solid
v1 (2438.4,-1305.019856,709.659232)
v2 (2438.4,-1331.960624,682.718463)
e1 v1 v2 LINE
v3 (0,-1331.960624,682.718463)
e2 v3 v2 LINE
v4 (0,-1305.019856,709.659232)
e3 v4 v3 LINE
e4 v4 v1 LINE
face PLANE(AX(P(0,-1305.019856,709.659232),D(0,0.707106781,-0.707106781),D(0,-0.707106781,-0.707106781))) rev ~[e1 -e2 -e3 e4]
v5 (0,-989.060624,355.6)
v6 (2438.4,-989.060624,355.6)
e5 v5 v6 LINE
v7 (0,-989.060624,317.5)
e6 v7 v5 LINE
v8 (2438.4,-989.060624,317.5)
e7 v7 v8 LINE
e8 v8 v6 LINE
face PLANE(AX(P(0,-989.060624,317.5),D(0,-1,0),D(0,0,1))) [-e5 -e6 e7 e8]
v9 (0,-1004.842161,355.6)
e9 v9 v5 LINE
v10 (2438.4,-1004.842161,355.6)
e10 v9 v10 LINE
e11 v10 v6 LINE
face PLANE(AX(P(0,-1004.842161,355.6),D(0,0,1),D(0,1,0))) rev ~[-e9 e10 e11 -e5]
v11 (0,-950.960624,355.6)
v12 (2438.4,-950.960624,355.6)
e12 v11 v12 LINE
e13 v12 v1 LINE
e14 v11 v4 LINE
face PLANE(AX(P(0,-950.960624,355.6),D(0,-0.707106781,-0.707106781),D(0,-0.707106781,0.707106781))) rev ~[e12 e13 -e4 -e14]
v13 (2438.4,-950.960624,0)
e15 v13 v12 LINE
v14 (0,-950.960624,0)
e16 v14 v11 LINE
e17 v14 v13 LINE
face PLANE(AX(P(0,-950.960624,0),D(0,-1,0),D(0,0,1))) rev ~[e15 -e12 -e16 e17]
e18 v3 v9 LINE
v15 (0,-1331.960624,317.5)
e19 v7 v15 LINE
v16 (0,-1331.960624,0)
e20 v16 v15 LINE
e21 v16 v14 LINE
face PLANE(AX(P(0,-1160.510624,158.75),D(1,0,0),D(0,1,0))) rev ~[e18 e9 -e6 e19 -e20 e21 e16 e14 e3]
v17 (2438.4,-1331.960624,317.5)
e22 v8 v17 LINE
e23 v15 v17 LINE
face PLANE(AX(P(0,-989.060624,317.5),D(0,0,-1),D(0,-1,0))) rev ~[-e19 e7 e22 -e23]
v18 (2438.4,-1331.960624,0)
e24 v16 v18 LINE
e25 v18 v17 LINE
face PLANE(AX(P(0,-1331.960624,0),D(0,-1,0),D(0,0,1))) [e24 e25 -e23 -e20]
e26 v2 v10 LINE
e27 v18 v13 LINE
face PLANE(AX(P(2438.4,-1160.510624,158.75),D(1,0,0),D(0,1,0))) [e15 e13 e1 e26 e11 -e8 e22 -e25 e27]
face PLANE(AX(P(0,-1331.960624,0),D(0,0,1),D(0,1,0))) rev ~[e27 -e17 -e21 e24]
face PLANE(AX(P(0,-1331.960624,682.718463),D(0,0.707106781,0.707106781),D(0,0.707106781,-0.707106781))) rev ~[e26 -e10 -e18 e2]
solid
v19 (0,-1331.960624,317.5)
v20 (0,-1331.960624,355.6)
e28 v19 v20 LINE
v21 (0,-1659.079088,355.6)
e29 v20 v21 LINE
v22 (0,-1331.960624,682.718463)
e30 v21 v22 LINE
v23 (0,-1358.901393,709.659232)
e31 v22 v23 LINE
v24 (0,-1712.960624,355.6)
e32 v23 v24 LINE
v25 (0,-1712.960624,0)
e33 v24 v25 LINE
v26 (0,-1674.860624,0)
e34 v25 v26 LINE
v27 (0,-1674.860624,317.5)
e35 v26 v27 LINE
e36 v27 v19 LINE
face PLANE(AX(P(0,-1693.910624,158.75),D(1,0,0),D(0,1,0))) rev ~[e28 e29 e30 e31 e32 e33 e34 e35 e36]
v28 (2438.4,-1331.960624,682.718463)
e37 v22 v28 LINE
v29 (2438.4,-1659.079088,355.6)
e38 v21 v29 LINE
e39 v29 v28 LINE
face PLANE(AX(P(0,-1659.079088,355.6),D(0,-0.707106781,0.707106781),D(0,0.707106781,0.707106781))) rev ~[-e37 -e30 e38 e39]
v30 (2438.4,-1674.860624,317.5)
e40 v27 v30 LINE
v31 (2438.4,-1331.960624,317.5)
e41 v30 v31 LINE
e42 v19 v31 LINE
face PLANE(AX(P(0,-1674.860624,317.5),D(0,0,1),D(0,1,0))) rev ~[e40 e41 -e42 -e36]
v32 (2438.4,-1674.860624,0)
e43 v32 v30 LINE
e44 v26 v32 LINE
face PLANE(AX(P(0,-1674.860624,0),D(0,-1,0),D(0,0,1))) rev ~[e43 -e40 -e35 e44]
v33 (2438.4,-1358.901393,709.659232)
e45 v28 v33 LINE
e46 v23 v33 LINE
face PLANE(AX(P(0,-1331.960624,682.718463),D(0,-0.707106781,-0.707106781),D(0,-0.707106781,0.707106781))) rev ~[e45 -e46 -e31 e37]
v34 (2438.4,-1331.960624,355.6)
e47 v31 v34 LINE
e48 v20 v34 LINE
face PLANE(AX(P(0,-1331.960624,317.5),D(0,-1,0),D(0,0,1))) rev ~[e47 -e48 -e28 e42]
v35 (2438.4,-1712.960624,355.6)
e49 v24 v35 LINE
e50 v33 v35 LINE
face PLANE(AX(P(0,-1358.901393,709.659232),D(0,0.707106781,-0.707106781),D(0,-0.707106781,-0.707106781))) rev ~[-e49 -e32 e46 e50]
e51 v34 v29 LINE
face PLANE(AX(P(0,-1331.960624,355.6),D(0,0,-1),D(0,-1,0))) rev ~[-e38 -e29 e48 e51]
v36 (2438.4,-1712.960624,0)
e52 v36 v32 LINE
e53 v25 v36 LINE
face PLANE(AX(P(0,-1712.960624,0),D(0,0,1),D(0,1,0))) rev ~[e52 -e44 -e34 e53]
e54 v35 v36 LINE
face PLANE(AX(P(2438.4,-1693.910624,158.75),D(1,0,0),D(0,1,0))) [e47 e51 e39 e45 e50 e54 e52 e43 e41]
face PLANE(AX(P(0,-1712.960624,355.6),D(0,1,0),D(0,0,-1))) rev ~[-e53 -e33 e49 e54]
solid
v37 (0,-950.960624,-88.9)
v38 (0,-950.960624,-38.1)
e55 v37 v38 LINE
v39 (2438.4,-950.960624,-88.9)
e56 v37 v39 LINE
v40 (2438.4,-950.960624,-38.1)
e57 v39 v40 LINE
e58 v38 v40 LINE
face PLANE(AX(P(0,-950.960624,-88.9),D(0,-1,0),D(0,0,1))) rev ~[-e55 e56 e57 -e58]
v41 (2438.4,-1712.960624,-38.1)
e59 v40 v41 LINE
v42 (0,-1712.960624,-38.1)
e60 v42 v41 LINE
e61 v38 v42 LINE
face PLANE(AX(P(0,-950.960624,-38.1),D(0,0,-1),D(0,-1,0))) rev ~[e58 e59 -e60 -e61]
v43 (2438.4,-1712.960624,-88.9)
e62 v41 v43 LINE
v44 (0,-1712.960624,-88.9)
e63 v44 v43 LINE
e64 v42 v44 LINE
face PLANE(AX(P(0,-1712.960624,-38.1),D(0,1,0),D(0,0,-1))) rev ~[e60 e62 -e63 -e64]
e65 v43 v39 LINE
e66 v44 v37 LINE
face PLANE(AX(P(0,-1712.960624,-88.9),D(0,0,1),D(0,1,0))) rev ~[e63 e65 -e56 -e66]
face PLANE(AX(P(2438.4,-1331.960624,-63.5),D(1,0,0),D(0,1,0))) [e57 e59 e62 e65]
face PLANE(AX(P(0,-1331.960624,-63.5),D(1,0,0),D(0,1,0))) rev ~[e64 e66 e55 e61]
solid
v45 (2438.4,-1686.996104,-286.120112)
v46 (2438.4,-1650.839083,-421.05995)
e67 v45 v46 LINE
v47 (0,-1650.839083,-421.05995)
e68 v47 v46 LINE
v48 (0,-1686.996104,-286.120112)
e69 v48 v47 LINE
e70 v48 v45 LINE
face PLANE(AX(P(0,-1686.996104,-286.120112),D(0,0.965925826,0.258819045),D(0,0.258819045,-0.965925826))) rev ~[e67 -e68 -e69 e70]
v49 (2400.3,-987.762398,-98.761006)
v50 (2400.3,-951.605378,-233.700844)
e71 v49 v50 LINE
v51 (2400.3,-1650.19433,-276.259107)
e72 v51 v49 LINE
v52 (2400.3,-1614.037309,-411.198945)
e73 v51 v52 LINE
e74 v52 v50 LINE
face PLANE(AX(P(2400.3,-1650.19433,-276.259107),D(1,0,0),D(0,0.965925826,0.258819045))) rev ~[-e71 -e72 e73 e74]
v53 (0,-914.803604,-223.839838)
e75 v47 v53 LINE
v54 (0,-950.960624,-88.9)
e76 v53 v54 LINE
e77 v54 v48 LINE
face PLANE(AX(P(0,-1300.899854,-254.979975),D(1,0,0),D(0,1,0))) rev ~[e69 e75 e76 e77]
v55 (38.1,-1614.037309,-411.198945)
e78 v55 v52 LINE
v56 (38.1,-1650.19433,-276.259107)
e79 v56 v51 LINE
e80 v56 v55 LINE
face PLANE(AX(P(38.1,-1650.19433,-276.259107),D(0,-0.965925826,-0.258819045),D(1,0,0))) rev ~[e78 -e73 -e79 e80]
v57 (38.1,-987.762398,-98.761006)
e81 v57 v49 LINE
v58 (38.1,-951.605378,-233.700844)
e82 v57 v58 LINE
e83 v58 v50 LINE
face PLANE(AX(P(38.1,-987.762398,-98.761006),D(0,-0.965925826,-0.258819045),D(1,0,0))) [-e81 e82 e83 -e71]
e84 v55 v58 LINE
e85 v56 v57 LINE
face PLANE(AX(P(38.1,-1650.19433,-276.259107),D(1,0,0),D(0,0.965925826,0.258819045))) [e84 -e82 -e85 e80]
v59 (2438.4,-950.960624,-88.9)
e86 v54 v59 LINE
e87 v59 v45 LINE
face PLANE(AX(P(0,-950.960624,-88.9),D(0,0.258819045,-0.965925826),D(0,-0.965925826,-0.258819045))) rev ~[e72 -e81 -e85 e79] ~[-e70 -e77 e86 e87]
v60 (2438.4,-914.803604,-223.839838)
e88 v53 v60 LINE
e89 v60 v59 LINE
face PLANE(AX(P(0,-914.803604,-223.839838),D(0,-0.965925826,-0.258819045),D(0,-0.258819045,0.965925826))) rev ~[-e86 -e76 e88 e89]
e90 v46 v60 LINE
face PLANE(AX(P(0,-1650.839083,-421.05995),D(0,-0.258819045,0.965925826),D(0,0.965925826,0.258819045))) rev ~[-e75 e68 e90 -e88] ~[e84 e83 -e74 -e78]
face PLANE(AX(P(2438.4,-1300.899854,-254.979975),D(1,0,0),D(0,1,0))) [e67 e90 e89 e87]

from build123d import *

# Parameters (mm, degrees)
F1_DEPTH = 2438.4
F2_W     = 2362.2
F2_H     = 685.8
F3_DEPTH = 203.2
F4_DEPTH = 2438.4
F0_W     = 342.9
F0_H     = 317.5
F0_W_2   = 38.1
F0_H_2   = 38.1


# Not quite as in the source:
# - a feature names something its author has since deleted; it is built from what else it names


with BuildPart() as f1:
    # F0 (on Right) → F1 (new body)
    with BuildSketch(Plane.YZ):
        Polygon((-914.8036036659, -223.8398379326), (-950.9606242668, -88.9), (-1686.996103899, -286.1201123681), (-1650.8390832982, -421.0599503007), align=None)
    extrude(amount=F1_DEPTH)

    # F2 (on face) → F3 (cut)
    with BuildSketch(Plane(origin=(0, -41.4772828265, 154.7953268685), x_dir=(1, 0, 0), z_dir=(0, -0.2588190451, 0.9659258263))):
        with Locations((1219.2, -1322.5664398729)):
            Rectangle(F2_W, F2_H)
    extrude(amount=-F3_DEPTH, mode=Mode.SUBTRACT)


with BuildPart() as f4:
    # F0 (on Right) → F4 (new body)
    with BuildSketch(Plane.YZ):
        Polygon((-950.9606242668, -88.9), (-950.9606242668, -38.1), (-1331.9606242668, -38.1), (-1712.9606242668, -38.1), (-1712.9606242668, -88.9), align=None)
    extrude(amount=F4_DEPTH)


with BuildPart() as f4b:
    # F0 (on Right) → F4, piece 2 (new body)
    with BuildSketch(Plane.YZ):
        with Locations((-1160.5106242668, 158.75)):
            Rectangle(F0_W, F0_H)
        with Locations((-970.0106242668, 158.75)):
            Rectangle(F0_W_2, F0_H)
        with Locations((-970.0106242668, 336.55)):
            Rectangle(F0_W_2, F0_H_2)
        Polygon((-989.0606242668, 355.6), (-950.9606242668, 355.6), (-1305.0198559036, 709.6592316368), (-1331.9606242668, 682.7184632736), (-1004.8421609932, 355.6), align=None)
    extrude(amount=F4_DEPTH)


with BuildPart() as f4c:
    # F0 (on Right) → F4, piece 3 (new body)
    with BuildSketch(Plane.YZ):
        with Locations((-1693.9106242668, 158.75)):
            Rectangle(F0_W_2, F0_H)
        with Locations((-1693.9106242668, 336.55)):
            Rectangle(F0_W_2, F0_H_2)
        Polygon((-1331.9606242668, 317.5), (-1331.9606242668, 355.6), (-1659.0790875403, 355.6), (-1674.8606242668, 355.6), (-1674.8606242668, 317.5), align=None)
        Polygon((-1659.0790875403, 355.6), (-1331.9606242668, 682.7184632736), (-1358.90139263, 709.6592316368), (-1712.9606242668, 355.6), (-1674.8606242668, 355.6), align=None)
    extrude(amount=F4_DEPTH)


solid = Compound([f1.part, f4.part, f4b.part, f4c.part])
